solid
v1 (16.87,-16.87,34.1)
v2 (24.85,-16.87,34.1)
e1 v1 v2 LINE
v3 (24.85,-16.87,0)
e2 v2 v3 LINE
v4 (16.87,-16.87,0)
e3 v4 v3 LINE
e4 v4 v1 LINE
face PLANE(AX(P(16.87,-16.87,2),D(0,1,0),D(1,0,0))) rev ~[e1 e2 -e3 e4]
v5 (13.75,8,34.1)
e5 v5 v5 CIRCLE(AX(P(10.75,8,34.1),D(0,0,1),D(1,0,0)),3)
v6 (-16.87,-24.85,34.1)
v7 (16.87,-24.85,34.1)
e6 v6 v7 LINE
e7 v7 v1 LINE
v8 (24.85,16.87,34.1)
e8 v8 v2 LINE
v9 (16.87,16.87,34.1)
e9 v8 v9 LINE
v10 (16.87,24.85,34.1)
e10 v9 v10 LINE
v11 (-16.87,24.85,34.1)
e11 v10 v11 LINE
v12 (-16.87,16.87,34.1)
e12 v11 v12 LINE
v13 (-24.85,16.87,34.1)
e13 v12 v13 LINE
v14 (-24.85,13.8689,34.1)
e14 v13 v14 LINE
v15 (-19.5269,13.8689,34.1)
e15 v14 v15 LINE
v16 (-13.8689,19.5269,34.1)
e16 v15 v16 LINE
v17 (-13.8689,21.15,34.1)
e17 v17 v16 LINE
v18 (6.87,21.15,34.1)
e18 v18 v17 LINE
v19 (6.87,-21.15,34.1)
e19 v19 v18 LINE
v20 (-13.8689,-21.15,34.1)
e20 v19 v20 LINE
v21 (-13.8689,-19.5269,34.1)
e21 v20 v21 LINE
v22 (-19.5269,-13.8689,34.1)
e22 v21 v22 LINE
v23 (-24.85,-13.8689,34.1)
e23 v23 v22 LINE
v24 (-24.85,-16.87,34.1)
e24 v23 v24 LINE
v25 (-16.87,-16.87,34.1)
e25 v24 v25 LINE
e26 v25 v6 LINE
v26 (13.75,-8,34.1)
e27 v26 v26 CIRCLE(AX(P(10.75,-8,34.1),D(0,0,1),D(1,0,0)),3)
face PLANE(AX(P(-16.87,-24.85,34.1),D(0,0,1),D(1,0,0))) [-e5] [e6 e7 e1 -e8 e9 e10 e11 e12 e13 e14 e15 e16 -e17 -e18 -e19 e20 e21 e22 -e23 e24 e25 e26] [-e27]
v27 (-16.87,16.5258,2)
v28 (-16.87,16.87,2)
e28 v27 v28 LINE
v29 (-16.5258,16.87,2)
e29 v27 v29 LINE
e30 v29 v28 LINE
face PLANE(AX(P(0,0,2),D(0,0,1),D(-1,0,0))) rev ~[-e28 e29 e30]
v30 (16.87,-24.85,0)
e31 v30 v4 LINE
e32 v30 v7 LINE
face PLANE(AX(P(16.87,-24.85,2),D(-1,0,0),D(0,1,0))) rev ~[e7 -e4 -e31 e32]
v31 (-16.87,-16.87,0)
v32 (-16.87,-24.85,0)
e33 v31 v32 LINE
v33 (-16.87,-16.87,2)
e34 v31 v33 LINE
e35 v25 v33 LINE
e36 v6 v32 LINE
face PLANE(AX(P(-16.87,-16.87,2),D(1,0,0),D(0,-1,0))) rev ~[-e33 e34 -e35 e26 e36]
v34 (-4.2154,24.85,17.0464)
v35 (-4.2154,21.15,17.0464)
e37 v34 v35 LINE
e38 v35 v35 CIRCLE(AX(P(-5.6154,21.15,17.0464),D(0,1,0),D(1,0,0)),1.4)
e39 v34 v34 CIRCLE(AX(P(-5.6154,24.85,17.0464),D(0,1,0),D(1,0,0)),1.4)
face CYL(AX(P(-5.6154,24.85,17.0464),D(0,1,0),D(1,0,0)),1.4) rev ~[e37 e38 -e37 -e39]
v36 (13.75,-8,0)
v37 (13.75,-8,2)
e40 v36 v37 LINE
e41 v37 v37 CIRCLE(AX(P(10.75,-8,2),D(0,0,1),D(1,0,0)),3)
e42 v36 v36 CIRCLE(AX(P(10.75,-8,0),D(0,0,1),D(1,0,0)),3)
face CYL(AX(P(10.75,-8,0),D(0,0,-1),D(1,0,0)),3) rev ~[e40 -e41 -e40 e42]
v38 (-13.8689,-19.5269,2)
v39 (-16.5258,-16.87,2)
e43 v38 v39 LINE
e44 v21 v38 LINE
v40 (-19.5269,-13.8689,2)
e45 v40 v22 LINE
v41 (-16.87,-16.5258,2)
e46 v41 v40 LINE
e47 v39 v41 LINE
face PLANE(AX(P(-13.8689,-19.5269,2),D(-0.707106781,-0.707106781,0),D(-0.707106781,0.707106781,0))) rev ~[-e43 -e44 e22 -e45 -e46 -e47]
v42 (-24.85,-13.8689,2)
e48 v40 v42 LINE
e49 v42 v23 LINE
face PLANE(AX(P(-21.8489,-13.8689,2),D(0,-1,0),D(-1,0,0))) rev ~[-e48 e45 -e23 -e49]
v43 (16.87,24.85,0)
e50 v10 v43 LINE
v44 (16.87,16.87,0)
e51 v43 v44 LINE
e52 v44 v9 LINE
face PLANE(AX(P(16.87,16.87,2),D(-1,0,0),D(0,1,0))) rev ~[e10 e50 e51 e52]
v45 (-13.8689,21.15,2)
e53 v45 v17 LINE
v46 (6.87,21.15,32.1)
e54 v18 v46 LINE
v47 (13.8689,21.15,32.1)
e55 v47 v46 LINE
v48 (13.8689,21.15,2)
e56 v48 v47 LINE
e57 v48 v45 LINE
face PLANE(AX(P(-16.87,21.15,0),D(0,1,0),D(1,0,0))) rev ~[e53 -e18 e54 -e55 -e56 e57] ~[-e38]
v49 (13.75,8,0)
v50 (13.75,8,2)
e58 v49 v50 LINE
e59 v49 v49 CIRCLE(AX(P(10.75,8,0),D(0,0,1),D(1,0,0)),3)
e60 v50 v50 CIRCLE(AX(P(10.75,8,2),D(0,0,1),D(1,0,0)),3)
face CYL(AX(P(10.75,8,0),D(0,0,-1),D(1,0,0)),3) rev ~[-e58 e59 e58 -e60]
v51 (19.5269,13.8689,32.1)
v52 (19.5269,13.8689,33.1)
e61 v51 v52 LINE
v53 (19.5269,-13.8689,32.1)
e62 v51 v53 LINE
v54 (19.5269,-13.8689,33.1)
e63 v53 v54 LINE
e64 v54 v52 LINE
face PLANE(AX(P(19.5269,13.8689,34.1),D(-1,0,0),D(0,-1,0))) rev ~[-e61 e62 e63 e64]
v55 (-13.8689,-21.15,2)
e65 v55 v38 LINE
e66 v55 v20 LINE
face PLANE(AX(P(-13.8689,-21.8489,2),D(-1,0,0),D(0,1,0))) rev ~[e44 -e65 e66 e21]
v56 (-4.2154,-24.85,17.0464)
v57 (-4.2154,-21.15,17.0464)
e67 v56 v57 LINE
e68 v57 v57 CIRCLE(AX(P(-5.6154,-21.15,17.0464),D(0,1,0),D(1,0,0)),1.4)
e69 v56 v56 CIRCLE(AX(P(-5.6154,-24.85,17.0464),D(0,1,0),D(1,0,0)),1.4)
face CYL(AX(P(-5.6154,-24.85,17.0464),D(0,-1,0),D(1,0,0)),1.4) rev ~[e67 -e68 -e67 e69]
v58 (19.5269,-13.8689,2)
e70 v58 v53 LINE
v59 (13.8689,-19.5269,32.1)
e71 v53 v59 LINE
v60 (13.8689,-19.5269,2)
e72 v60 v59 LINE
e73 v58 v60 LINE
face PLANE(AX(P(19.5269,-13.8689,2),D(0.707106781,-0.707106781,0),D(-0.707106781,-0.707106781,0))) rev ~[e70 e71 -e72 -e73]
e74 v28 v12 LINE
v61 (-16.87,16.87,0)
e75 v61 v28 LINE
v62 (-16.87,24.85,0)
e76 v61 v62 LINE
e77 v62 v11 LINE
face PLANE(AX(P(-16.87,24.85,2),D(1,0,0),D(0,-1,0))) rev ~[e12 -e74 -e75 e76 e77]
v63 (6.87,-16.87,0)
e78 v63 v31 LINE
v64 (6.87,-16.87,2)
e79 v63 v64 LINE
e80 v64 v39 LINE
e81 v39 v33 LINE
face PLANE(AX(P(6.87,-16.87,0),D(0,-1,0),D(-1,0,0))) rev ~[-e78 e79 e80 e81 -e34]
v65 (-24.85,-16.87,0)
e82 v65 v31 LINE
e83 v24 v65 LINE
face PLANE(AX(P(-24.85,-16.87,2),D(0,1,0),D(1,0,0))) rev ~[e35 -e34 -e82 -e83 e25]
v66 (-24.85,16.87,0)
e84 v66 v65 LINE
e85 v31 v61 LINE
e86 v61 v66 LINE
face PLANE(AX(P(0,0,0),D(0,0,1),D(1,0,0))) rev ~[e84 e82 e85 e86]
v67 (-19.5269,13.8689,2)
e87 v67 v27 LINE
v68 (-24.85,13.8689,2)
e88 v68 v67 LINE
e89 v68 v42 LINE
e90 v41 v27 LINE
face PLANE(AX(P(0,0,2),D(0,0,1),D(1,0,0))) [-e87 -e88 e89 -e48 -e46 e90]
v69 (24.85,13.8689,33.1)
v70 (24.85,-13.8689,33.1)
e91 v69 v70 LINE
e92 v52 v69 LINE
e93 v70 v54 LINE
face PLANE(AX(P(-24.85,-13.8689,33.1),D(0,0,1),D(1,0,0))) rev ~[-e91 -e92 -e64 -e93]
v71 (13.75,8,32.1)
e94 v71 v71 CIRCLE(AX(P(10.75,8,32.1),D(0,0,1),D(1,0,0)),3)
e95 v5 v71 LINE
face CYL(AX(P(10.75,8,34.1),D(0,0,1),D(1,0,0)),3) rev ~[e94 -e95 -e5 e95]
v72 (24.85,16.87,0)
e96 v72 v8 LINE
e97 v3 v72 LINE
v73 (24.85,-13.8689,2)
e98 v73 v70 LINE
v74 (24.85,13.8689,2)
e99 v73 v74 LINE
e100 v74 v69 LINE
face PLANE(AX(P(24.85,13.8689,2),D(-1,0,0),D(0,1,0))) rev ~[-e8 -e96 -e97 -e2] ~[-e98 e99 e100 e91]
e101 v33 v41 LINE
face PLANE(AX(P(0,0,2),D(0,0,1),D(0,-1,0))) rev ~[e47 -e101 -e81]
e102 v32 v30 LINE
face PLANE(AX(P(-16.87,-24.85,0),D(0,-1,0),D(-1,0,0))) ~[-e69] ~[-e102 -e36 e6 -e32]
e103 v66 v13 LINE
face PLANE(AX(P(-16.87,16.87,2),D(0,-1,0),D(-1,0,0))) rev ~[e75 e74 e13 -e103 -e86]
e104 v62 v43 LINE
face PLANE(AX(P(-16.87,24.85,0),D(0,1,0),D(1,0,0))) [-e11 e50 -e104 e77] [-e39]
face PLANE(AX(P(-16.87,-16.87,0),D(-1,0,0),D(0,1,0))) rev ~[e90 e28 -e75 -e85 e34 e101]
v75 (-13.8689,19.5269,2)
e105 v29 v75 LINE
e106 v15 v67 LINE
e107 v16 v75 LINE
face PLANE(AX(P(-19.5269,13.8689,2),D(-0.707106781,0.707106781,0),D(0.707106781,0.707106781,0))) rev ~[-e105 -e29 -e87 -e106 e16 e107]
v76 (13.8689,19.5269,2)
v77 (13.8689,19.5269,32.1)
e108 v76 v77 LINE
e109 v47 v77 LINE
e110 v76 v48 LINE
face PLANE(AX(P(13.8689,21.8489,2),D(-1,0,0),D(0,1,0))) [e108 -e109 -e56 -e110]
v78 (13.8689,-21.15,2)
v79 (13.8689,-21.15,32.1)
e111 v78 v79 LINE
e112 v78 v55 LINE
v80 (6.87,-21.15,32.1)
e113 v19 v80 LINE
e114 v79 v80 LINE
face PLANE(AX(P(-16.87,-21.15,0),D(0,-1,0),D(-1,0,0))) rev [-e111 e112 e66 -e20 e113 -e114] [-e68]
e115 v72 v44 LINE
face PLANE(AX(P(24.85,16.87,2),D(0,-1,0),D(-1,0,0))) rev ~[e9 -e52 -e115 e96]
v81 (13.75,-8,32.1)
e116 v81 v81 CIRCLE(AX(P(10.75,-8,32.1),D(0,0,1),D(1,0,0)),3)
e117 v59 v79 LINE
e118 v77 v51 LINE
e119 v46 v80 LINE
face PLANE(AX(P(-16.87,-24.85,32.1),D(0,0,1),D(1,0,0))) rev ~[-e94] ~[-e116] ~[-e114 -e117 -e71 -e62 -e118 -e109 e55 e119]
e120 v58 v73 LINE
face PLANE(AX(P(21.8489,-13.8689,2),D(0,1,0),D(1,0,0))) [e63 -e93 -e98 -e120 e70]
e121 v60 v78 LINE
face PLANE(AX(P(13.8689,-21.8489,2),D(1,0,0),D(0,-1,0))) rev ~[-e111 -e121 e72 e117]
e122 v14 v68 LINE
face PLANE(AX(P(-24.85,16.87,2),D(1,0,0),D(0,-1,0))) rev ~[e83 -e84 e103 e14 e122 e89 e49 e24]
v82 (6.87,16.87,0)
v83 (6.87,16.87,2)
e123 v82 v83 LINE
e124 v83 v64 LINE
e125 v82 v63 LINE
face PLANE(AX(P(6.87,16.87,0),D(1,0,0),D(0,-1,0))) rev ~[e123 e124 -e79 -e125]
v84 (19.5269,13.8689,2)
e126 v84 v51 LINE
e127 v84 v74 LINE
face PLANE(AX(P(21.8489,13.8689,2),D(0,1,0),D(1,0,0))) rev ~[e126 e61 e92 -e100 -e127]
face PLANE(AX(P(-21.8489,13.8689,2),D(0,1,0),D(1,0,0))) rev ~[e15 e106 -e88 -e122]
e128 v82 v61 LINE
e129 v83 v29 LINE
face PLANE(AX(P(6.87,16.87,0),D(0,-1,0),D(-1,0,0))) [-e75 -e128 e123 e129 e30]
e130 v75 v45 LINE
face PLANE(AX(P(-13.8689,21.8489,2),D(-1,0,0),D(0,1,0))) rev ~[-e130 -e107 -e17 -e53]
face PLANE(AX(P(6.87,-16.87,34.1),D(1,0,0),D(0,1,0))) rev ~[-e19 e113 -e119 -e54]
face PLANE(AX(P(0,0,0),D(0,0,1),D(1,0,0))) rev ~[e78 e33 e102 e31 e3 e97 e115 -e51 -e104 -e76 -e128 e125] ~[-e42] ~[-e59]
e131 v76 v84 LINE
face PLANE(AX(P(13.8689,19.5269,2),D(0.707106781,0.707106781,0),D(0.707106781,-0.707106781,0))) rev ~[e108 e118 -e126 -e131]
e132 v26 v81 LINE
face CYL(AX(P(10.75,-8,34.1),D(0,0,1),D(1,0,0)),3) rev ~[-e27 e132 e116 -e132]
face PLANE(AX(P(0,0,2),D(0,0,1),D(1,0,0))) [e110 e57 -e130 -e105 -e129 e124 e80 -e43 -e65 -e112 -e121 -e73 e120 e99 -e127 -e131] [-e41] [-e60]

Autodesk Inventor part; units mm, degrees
ref_plane "Work Plane1" through (0, 0, 0) normal (0, 0, 1) x (1, 0, 0)
sketch "Sketch1" plane through (0, 0, 0) normal (0, 0, 1) x (1, 0, 0)
  arc A0 (12.5934, -5.8404) -> (12.8401, -5.9947) centre (12.8241, -5.7459) ccw construction
  line L0 (12.8401, -5.9947) -> (16.4715, -5.9947) construction
  line L1 (16.4715, -5.9947) -> (16.97, -5.4961) construction
  line L2 (16.97, -5.4961) -> (16.97, 1.583) construction
  arc A1 (16.97, 2.3806) -> (16.97, 1.583) centre (17.2691, 1.9818) ccw construction
  line L3 (16.97, 2.3806) -> (16.97, 5.4715) construction
  line L4 (16.97, 5.4715) -> (16.4715, 5.97) construction
  line L5 (16.4715, 5.97) -> (12.8401, 5.97) construction
  arc A2 (12.8401, 5.97) -> (12.6094, 5.8152) centre (12.8401, 5.7207) ccw construction
  arc A3 (12.0954, 5.2394) -> (12.6094, 5.8152) centre (11.5075, 6.2814) ccw construction
  arc A4 (12.0954, 5.2394) -> (11.974, 5.0466) centre (12.2223, 5.0248) ccw construction
  line L6 (11.974, 5.0466) -> (11.9439, 4.702) construction
  arc A5 (11.6955, 4.4744) -> (11.9439, 4.702) centre (11.6955, 4.7237) ccw construction
  line L7 (11.6955, 4.4744) -> (11.2445, 4.4744) construction
  arc A6 (10.9961, 4.702) -> (11.2445, 4.4744) centre (11.2445, 4.7237) ccw construction
  line L8 (10.9961, 4.702) -> (10.9642, 5.0674) construction
  arc A7 (10.9642, 5.0674) -> (10.8487, 5.2566) centre (10.7158, 5.0457) ccw construction
  arc A8 (10.3792, 5.8152) -> (10.8487, 5.2566) centre (11.4862, 6.2691) ccw construction
  arc A9 (10.3792, 5.8152) -> (10.1485, 5.97) centre (10.1485, 5.7206) ccw construction
  line L9 (10.1485, 5.97) -> (9.4685, 5.97) construction
  line L10 (9.4685, 5.97) -> (8.97, 5.4715) construction
  line L11 (8.97, 5.4715) -> (8.97, -5.4961) construction
  line L12 (8.97, -5.4961) -> (9.4685, -5.9947) construction
  line L13 (9.4685, -5.9947) -> (10.1412, -5.9947) construction
  arc A10 (10.1412, -5.9947) -> (10.3791, -5.84) centre (10.1485, -5.7455) ccw construction
  arc A11 (10.8487, -5.2813) -> (10.3791, -5.84) centre (11.4862, -6.2938) ccw construction
  arc A12 (10.8487, -5.2813) -> (10.9642, -5.0921) centre (10.7158, -5.0704) ccw construction
  line L14 (10.9642, -5.0921) -> (10.9961, -4.7266) construction
  arc A13 (11.2445, -4.4991) -> (10.9961, -4.7266) centre (11.2445, -4.7483) ccw construction
  line L15 (11.2445, -4.4991) -> (11.6955, -4.4991) construction
  arc A14 (11.9439, -4.7266) -> (11.6955, -4.4991) centre (11.6955, -4.7483) ccw construction
  line L16 (11.9439, -4.7266) -> (11.974, -5.0712) construction
  arc A15 (11.974, -5.0712) -> (12.0954, -5.264) centre (12.2223, -5.0495) ccw construction
  arc A16 (12.5934, -5.8404) -> (12.0954, -5.264) centre (11.4862, -6.2938) ccw construction
  arc A17 (24.85, 22.85) -> (22.85, 24.85) centre (22.85, 22.85) ccw construction
  line L17 (22.85, 24.85) -> (-16.97, 24.85) construction
  line L18 (-16.97, 24.85) -> (-16.97, 21.15) construction
  line L19 (-16.97, 21.15) -> (16.97, 21.15) construction
  line L20 (16.97, 16.97) -> (16.97, 21.15) construction
  line L21 (21.15, 16.97) -> (16.97, 16.97) construction
  line L22 (21.15, 16.97) -> (21.15, -16.97) construction
  line L23 (21.15, -16.97) -> (24.85, -16.97) construction
  line L24 (24.85, -16.97) -> (24.85, 22.85) construction
  line L25 (23.75, 23.25) -> (23.75, 18.15) construction
  arc A18 (23.25, 17.65) -> (23.75, 18.15) centre (23.25, 18.15) ccw construction
  line L26 (23.25, 17.65) -> (20.8937, 17.65) construction
  arc A19 (20.5239, 17.8134) -> (20.8937, 17.65) centre (20.8937, 18.15) ccw construction
  line L27 (20.5239, 17.8134) -> (17.7803, 20.8273) construction
  arc A20 (17.65, 21.1639) -> (17.7803, 20.8273) centre (18.15, 21.1639) ccw construction
  line L28 (17.65, 21.1639) -> (17.65, 23.25) construction
  arc A21 (18.15, 23.75) -> (17.65, 23.25) centre (18.15, 23.25) ccw construction
  line L29 (18.15, 23.75) -> (23.25, 23.75) construction
  arc A22 (23.75, 23.25) -> (23.25, 23.75) centre (23.25, 23.25) ccw construction
  arc A23 (-24.85, -22.85) -> (-22.85, -24.85) centre (-22.85, -22.85) ccw construction
  line L30 (-22.85, -24.85) -> (16.97, -24.85) construction
  line L31 (16.97, -24.85) -> (16.97, -21.15) construction
  line L32 (16.97, -21.15) -> (-16.97, -21.15) construction
  line L33 (-16.97, -16.97) -> (-16.97, -21.15) construction
  line L34 (-21.15, -16.97) -> (-16.97, -16.97) construction
  line L35 (-21.15, -16.97) -> (-21.15, 16.97) construction
  line L36 (-21.15, 16.97) -> (-24.85, 16.97) construction
  line L37 (-24.85, 16.97) -> (-24.85, -22.85) construction
  line L38 (-20.8273, -17.7803) -> (-17.8134, -20.5239) construction
  arc A24 (-17.65, -20.8937) -> (-17.8134, -20.5239) centre (-18.15, -20.8937) ccw construction
  line L39 (-17.65, -20.8937) -> (-17.65, -23.25) construction
  arc A25 (-18.15, -23.75) -> (-17.65, -23.25) centre (-18.15, -23.25) ccw construction
  line L40 (-18.15, -23.75) -> (-23.25, -23.75) construction
  arc A26 (-23.75, -23.25) -> (-23.25, -23.75) centre (-23.25, -23.25) ccw construction
  line L41 (-23.75, -23.25) -> (-23.75, -18.15) construction
  arc A27 (-23.25, -17.65) -> (-23.75, -18.15) centre (-23.25, -18.15) ccw construction
  line L42 (-23.25, -17.65) -> (-21.1639, -17.65) construction
  arc A28 (-20.8273, -17.7803) -> (-21.1639, -17.65) centre (-21.1639, -18.15) ccw construction
  arc A29 (-22.85, 24.85) -> (-24.85, 22.85) centre (-22.85, 22.85) ccw construction
  line L43 (-22.85, 24.85) -> (16.97, 24.85) construction
  line L44 (16.97, 24.85) -> (16.97, 21.15) construction
  line L45 (16.97, 21.15) -> (-16.97, 21.15) construction
  line L46 (-16.97, 16.97) -> (-16.97, 21.15) construction
  line L47 (-21.15, 16.97) -> (-16.97, 16.97) construction
  line L48 (-21.15, 16.97) -> (-21.15, -16.97) construction
  line L49 (-21.15, -16.97) -> (-24.85, -16.97) construction
  line L50 (-24.85, -16.97) -> (-24.85, 22.85) construction
  line L51 (-20.8273, 17.7803) -> (-17.8134, 20.5239) construction
  arc A30 (-17.8134, 20.5239) -> (-17.65, 20.8937) centre (-18.15, 20.8937) ccw construction
  line L52 (-17.65, 20.8937) -> (-17.65, 23.25) construction
  arc A31 (-17.65, 23.25) -> (-18.15, 23.75) centre (-18.15, 23.25) ccw construction
  line L53 (-18.15, 23.75) -> (-23.25, 23.75) construction
  arc A32 (-23.25, 23.75) -> (-23.75, 23.25) centre (-23.25, 23.25) ccw construction
  line L54 (-23.75, 23.25) -> (-23.75, 18.15) construction
  arc A33 (-23.75, 18.15) -> (-23.25, 17.65) centre (-23.25, 18.15) ccw construction
  line L55 (-23.25, 17.65) -> (-21.1639, 17.65) construction
  arc A34 (-21.1639, 17.65) -> (-20.8273, 17.7803) centre (-21.1639, 18.15) ccw construction
  arc A35 (22.85, -24.85) -> (24.85, -22.85) centre (22.85, -22.85) ccw construction
  line L56 (22.85, -24.85) -> (-16.97, -24.85) construction
  line L57 (-16.97, -24.85) -> (-16.97, -21.15) construction
  line L58 (-16.97, -21.15) -> (16.97, -21.15) construction
  line L59 (16.97, -16.97) -> (16.97, -21.15) construction
  line L60 (21.15, -16.97) -> (16.97, -16.97) construction
  line L61 (21.15, -16.97) -> (21.15, 16.97) construction
  line L62 (21.15, 16.97) -> (24.85, 16.97) construction
  line L63 (24.85, 16.97) -> (24.85, -22.85) construction
  line L64 (23.75, -23.25) -> (23.75, -18.15) construction
  arc A36 (23.75, -18.15) -> (23.25, -17.65) centre (23.25, -18.15) ccw construction
  line L65 (23.25, -17.65) -> (20.8937, -17.65) construction
  arc A37 (20.8937, -17.65) -> (20.5239, -17.8134) centre (20.8937, -18.15) ccw construction
  line L66 (20.5239, -17.8134) -> (17.7803, -20.8273) construction
  arc A38 (17.7803, -20.8273) -> (17.65, -21.1639) centre (18.15, -21.1639) ccw construction
  line L67 (17.65, -21.1639) -> (17.65, -23.25) construction
  arc A39 (17.65, -23.25) -> (18.15, -23.75) centre (18.15, -23.25) ccw construction
  line L68 (18.15, -23.75) -> (23.25, -23.75) construction
  arc A40 (23.25, -23.75) -> (23.75, -23.25) centre (23.25, -23.25) ccw construction
  circle A41 centre (0.47, -10.47) radius 1.1 construction
  circle A42 centre (0.47, 12.53) radius 1.025 construction
  line L69 (24.85, 16.87) -> (16.87, 16.87)
  line L70 (16.87, 16.87) -> (16.87, -16.87)
  line L71 (16.87, -16.87) -> (24.85, -16.87)
  line L72 (24.85, -16.87) -> (24.85, 16.87)
  line L73 (-16.87, 24.85) -> (16.87, 24.85)
  line L74 (16.87, 24.85) -> (16.87, 16.87)
  line L75 (16.87, 16.87) -> (-16.87, 16.87)
  line L76 (-16.87, 16.87) -> (-16.87, 24.85)
  line L77 (-16.87, 16.87) -> (-24.85, 16.87)
  line L78 (-24.85, 16.87) -> (-24.85, -16.87)
  line L79 (-24.85, -16.87) -> (-16.87, -16.87)
  line L80 (-16.87, -16.87) -> (-16.87, 16.87)
  line L81 (-16.87, -24.85) -> (16.87, -24.85)
  line L82 (16.87, -24.85) -> (16.87, -16.87)
  line L83 (16.87, -16.87) -> (-16.87, -16.87)
  line L84 (-16.87, -16.87) -> (-16.87, -24.85)
  circle A43 centre (10.75, 8) radius 3 projected
  circle A44 centre (10.75, -8) radius 3 projected
  line L85 (16.87, 16.87) -> (6.87, 16.87)
  line L86 (6.87, 16.87) -> (6.87, -16.87)
  line L87 (6.87, -16.87) -> (16.87, -16.87)
  line L88 (16.87, -16.87) -> (16.87, 16.87)
  point P0 (0, 0)
  dimension "d1" = 0.1
  dimension "d2" = 0.1
  dimension "d3" = 0.1
  dimension "d4" = 0.1
  dimension "d5" = 0.1
  dimension "d6" = 0
  dimension "d7" = 0
  dimension "d90" = 10
  dimension "d91" = 33.74
extrude "Extrusion1" add sketch "Sketch1" along normal blind 2 contours L72 L71 L70 L69 | L75 L76 L73 L74 | L70 L83 L86 L75 | L82 L81 L84 L83 | L80 L79 L78 L77
chamfer "Chamfer1" [suppressed]
sketch "Sketch2" plane through (0, 0, 2) normal (0, 0, 1) x (1, 0, 0)
  line L0 (-16.87, -16.87) -> (-16.87, 16.87) projected
  line L1 (-16.87, 16.87) -> (6.87, 16.87) projected
  line L2 (6.87, -16.87) -> (-16.87, -16.87) projected
  line L3 (-16.87, -16.87) -> (-16.87, -24.85) projected
  line L4 (-16.87, -24.85) -> (16.87, -24.85) projected
  line L5 (16.87, -24.85) -> (16.87, -16.87) projected
  line L6 (16.87, -16.87) -> (24.85, -16.87) projected
  line L7 (24.85, -16.87) -> (24.85, 16.87) projected
  line L8 (24.85, 16.87) -> (16.87, 16.87) projected
  line L9 (16.87, 16.87) -> (16.87, 24.85) projected
  line L10 (16.87, 24.85) -> (-16.87, 24.85) projected
  line L11 (-16.87, 24.85) -> (-16.87, 16.87) projected
  line L12 (-16.87, 16.87) -> (-24.85, 16.87) projected
  line L13 (-24.85, 16.87) -> (-24.85, -16.87) projected
  line L14 (-24.85, -16.87) -> (-16.87, -16.87) projected
  line L15 (13.8689, -19.5269) -> (13.8689, -21.8489)
  line L16 (-13.8689, -21.8489) -> (-13.8689, -19.5269)
  line L17 (-13.8689, -19.5269) -> (-19.5269, -13.8689)
  line L18 (-19.5269, -13.8689) -> (-21.8489, -13.8689)
  line L19 (-21.8489, 13.8689) -> (-19.5269, 13.8689)
  line L20 (-19.5269, 13.8689) -> (-13.8689, 19.5269)
  line L21 (-13.8689, 19.5269) -> (-13.8689, 21.8489)
  line L22 (13.8689, 21.8489) -> (13.8689, 19.5269)
  line L23 (13.8689, 19.5269) -> (19.5269, 13.8689)
  line L24 (19.5269, 13.8689) -> (21.8489, 13.8689)
  line L25 (21.8489, -13.8689) -> (19.5269, -13.8689)
  line L26 (19.5269, -13.8689) -> (13.8689, -19.5269)
  line L27 (13.8689, -21.8489) -> (13.8689, -24.85)
  line L28 (16.87, -24.85) -> (-16.87, -24.85) projected
  line L29 (21.8489, -13.8689) -> (24.85, -13.8689)
  line L30 (24.85, -16.87) -> (24.85, 16.87) projected
  line L31 (21.8489, 13.8689) -> (24.85, 13.8689)
  line L32 (13.8689, 21.8489) -> (13.8689, 24.85)
  line L33 (-13.8689, 21.8489) -> (-13.8689, 24.85)
  line L34 (-21.8489, 13.8689) -> (-24.85, 13.8689)
  line L35 (-21.8489, -13.8689) -> (-24.85, -13.8689)
  line L36 (-13.8689, -21.8489) -> (-13.8689, -24.85)
  line L37 (13.8689, -21.8489) -> (11.5469, -21.8489)
  line L38 (-11.5469, -21.8489) -> (-13.8689, -21.8489)
  line L39 (21.8489, 13.8689) -> (21.8489, 11.5469)
  line L40 (21.8489, -11.5469) -> (21.8489, -13.8689)
  line L41 (-21.8489, -13.8689) -> (-21.8489, -11.5469)
  line L42 (-21.8489, 11.5469) -> (-21.8489, 13.8689)
  line L43 (-13.8689, 21.8489) -> (-11.5469, 21.8489)
  line L44 (11.5469, 21.8489) -> (13.8689, 21.8489)
  line L45 (6.87, 16.87) -> (6.87, -16.87) projected
  point P0 (0, 0)
  dimension "d13" = 3.0011
ref_plane "Work Plane2" through (-16.97, -24.85, 34.1) normal (0, 0, -1) x (0, 1, 0)
extrude "Extrusion2" add sketch "Sketch2" along normal up to surface (32.1 mm away) contours L27 L15 L26 L25 L29 L7 L6 L5 L4
pattern_circular "Circular Pattern1" count 4 over 360 about axis through (0, 0, 17.13) along (0, 0, -1) of "Extrusion2"
sketch "Sketch3" plane through (-24.85, -13.8689, 34.1) normal (0, 0, 1) x (1, 0, 0)
  circle A0 centre (13.82, 14.8989) radius 1.5 projected
  line L0 (10.9811, -5.658) -> (5.3231, 0) projected
  line L1 (5.3231, 0) -> (0, 0) projected
  line L2 (0, 0) -> (0, -3.0011) projected
  line L3 (0, -3.0011) -> (7.98, -3.0011) projected
  line L4 (7.98, -3.0011) -> (7.98, -10.9811) projected
  line L5 (7.98, -10.9811) -> (10.9811, -10.9811) projected
  line L6 (10.9811, -10.9811) -> (10.9811, -5.658) projected
  line L7 (5.3231, 27.7378) -> (10.9811, 33.3958) projected
  line L8 (10.9811, 33.3958) -> (10.9811, 38.7189) projected
  line L9 (10.9811, 38.7189) -> (7.98, 38.7189) projected
  line L10 (7.98, 38.7189) -> (7.98, 30.7389) projected
  line L11 (7.98, 30.7389) -> (0, 30.7389) projected
  line L12 (0, 30.7389) -> (0, 27.7378) projected
  line L13 (0, 27.7378) -> (5.3231, 27.7378) projected
  line L14 (10.9811, -10.9811) -> (16.9811, -10.9811)
  line L15 (16.9811, 38.7189) -> (10.9811, 38.7189)
  line L16 (0, 0) -> (0, 27.7378)
  line L17 (0, 0) -> (5.3231, 0)
  line L18 (5.3231, 0) -> (5.3231, 27.7378)
  line L19 (5.3231, 27.7378) -> (0, 27.7378)
  line L20 (0, 27.7378) -> (0, 0)
  line L21 (5.3231, 0) -> (0, 0) projected
  line L22 (5.3231, 0) -> (10.9811, -5.658)
  line L23 (10.9811, 33.3958) -> (5.3231, 27.7378)
  line L24 (38.7189, 38.7189) -> (38.7189, 33.3958) projected
  line L25 (38.7189, -5.658) -> (38.7189, -10.9811) projected
  line L26 (10.9811, -10.9811) -> (38.7189, -10.9811)
  line L27 (38.7189, -10.9811) -> (38.7189, -5.658)
  line L28 (38.7189, -5.658) -> (10.9811, -5.658)
  line L29 (10.9811, -5.658) -> (10.9811, -10.9811)
  line L30 (10.9811, 38.7189) -> (10.9811, 33.3958) projected
  line L31 (10.9811, 38.7189) -> (38.7189, 38.7189)
  line L32 (38.7189, 38.7189) -> (38.7189, 33.3958)
  line L33 (38.7189, 33.3958) -> (10.9811, 33.3958)
  line L34 (10.9811, 33.3958) -> (10.9811, 38.7189)
  line L35 (16.9811, -10.9811) -> (16.9811, -5.658)
  line L36 (16.9811, 33.3958) -> (16.9811, 38.7189)
  line L37 (10.9811, 38.7189) -> (10.9811, 33.3958)
  line L38 (10.9811, -5.658) -> (10.9811, -10.9811)
  line L39 (10.9811, -5.658) -> (10.9811, 0)
  line L40 (10.9811, 27.7378) -> (10.9811, 33.3958)
  line L41 (49.7, 0) -> (44.3769, 0) projected
  line L42 (44.3769, 27.7378) -> (49.7, 27.7378) projected
  line L43 (44.3769, 27.7378) -> (49.7, 27.7378)
  line L44 (49.7, 27.7378) -> (49.7, 0)
  line L45 (49.7, 0) -> (44.3769, 0)
  line L46 (44.3769, 0) -> (44.3769, 27.7378)
  point P0 (24.85, 13.8689)
  dimension "d19" = 6
extrude "Extrusion3" add sketch "Sketch3" against normal blind 1 contours L6 L5 L4 L3 L2 L1 L0 | L13 L12 L11 L10 L9 L8 L7 | L41 L46 L42 L44
ref_plane "Work Plane3" through (16.97, -5.4961, -37.9) normal (1, 0, 0) x (0, 1, 0)
ref_plane "Work Plane4" through (-25.03, -12.97, -12) normal (0, 0, 1) x (1, 0, 0)
sketch "Sketch14" plane through (-16.87, 24.85, 0) normal (0, 1, 0) x (1, 0, 0)
  line L0 (3.0011, -2) -> (3.0011, -34.1) projected
  line L1 (30.7389, -2) -> (3.0011, -2) projected
  line L2 (30.7389, -2) -> (30.7389, -34.1) projected
  line L3 (33.74, 0) -> (33.74, -34.1) projected
  line L4 (33.74, 0) -> (0, 0) projected
  line L5 (0, 0) -> (0, -34.1) projected
  line L6 (3.0011, -34.1) -> (0, -34.1) projected
  line L7 (3.0011, -2) -> (3.0011, -34.1) projected
  line L8 (30.7389, -34.1) -> (36.3969, -34.1) projected
  line L9 (3.0011, -2) -> (30.7389, -2)
  line L10 (30.7389, -2) -> (30.7389, -34.1)
  line L11 (30.7389, -34.1) -> (3.0011, -34.1)
  line L12 (3.0011, -34.1) -> (3.0011, -2)
  circle A0 centre (11.8112, -17.0464) radius 1.4 construction
  circle A1 centre (11.2546, -17.0464) radius 1.4
  line L13 (33.74, -34.1) -> (30.7389, -34.1) projected
  point P0 (16.87, 0)
  dimension "d89" = 2.8
extrude "Extrusion12" add sketch "Sketch14" against normal up to surface (3.7 mm away) contours L1 L2 L11 L0
ref_plane "Work Plane5" through (-24.85, 0, 0) normal (0, -1, 0) x (1, 0, 0)
mirror "Mirror1" about plane through (-24.85, 0, 0) normal (0, -1, 0) of "Extrusion12"
sketch "Sketch16" plane through (-16.87, -24.85, 34.1) normal (0, 0, 1) x (1, 0, 0)
  line L0 (0, 0) -> (33.74, 0) projected
  line L1 (33.74, 0) -> (33.74, 7.98) projected
  line L2 (33.74, 7.98) -> (41.72, 7.98) projected
  line L3 (41.72, 7.98) -> (41.72, 41.72) projected
  line L4 (3.0011, 44.3769) -> (3.0011, 46) projected
  line L5 (30.7389, 46) -> (3.0011, 46) projected
  line L6 (30.7389, 46) -> (30.7389, 44.3769) projected
  line L7 (30.7389, 44.3769) -> (36.3969, 38.7189) projected
  line L8 (36.3969, 38.7189) -> (36.3969, 10.9811) projected
  line L9 (36.3969, 10.9811) -> (30.7389, 5.3231) projected
  line L10 (30.7389, 5.3231) -> (30.7389, 3.7) projected
  line L11 (30.7389, 3.7) -> (3.0011, 3.7) projected
  line L12 (3.0011, 3.7) -> (3.0011, 5.3231) projected
  circle A0 centre (27.62, 16.85) radius 3 projected
  circle A1 centre (27.62, 32.85) radius 3 projected
  line L13 (0, 7.98) -> (-7.98, 7.98) projected
  line L14 (-7.98, 7.98) -> (-7.98, 41.72) projected
  line L15 (-7.98, 41.72) -> (0, 41.72) projected
  line L16 (0, 49.7) -> (0, 41.72) projected
  line L17 (33.74, 49.7) -> (0, 49.7) projected
  line L18 (33.74, 41.72) -> (33.74, 49.7) projected
  line L19 (41.72, 41.72) -> (33.74, 41.72) projected
  line L20 (41.72, 7.98) -> (41.72, 41.72) projected
  line L21 (41.72, 7.98) -> (33.74, 7.98) projected
  line L22 (33.74, 7.98) -> (33.74, 0) projected
  line L23 (33.74, 0) -> (0, 0) projected
  line L24 (0, 0) -> (0, 7.98) projected
  line L25 (0, 7.98) -> (23.74, 7.98) projected
  line L26 (23.74, 7.98) -> (23.74, 41.72) projected
  line L27 (0, 41.72) -> (23.74, 41.72) projected
  line L28 (0, 41.72) -> (0, 7.98) projected
  line L29 (23.74, 41.72) -> (23.74, 46)
  line L30 (30.7389, 46) -> (3.0011, 46) projected
  line L31 (23.74, 7.98) -> (23.74, 3.7)
  line L32 (30.7389, 3.7) -> (3.0011, 3.7) projected
  line L33 (-2.6569, 10.9811) -> (-7.98, 10.9811) projected
  line L34 (-7.98, 10.9811) -> (-7.98, 7.98) projected
  line L35 (-7.98, 7.98) -> (0, 7.98) projected
  line L36 (0, 7.98) -> (0, 0) projected
  line L37 (41.72, 41.72) -> (33.74, 41.72) projected
  line L38 (33.74, 41.72) -> (33.74, 49.7) projected
  line L39 (33.74, 49.7) -> (0, 49.7) projected
  line L40 (0, 49.7) -> (0, 41.72) projected
  line L41 (0, 41.72) -> (-7.98, 41.72) projected
  line L42 (-7.98, 41.72) -> (-7.98, 38.7189) projected
  line L43 (-7.98, 38.7189) -> (-2.6569, 38.7189) projected
  line L44 (-2.6569, 38.7189) -> (3.0011, 44.3769) projected
  line L45 (3.0011, 5.3231) -> (-2.6569, 10.9811) projected
  point P0 (16.87, 24.85)
extrude "Extrusion14" add sketch "Sketch16" against normal blind 2 contours L26 L29 L5 L6 L7 L8 L9 L10 L11 L31
equation "\"d2\" = d1"
equation "\"d3\" = d1"
equation "\"d4\" = d1"
equation "\"d5\" = d1"
properties part number "30_Cube_Z_Focus_Drylin_manual_base_v3"
